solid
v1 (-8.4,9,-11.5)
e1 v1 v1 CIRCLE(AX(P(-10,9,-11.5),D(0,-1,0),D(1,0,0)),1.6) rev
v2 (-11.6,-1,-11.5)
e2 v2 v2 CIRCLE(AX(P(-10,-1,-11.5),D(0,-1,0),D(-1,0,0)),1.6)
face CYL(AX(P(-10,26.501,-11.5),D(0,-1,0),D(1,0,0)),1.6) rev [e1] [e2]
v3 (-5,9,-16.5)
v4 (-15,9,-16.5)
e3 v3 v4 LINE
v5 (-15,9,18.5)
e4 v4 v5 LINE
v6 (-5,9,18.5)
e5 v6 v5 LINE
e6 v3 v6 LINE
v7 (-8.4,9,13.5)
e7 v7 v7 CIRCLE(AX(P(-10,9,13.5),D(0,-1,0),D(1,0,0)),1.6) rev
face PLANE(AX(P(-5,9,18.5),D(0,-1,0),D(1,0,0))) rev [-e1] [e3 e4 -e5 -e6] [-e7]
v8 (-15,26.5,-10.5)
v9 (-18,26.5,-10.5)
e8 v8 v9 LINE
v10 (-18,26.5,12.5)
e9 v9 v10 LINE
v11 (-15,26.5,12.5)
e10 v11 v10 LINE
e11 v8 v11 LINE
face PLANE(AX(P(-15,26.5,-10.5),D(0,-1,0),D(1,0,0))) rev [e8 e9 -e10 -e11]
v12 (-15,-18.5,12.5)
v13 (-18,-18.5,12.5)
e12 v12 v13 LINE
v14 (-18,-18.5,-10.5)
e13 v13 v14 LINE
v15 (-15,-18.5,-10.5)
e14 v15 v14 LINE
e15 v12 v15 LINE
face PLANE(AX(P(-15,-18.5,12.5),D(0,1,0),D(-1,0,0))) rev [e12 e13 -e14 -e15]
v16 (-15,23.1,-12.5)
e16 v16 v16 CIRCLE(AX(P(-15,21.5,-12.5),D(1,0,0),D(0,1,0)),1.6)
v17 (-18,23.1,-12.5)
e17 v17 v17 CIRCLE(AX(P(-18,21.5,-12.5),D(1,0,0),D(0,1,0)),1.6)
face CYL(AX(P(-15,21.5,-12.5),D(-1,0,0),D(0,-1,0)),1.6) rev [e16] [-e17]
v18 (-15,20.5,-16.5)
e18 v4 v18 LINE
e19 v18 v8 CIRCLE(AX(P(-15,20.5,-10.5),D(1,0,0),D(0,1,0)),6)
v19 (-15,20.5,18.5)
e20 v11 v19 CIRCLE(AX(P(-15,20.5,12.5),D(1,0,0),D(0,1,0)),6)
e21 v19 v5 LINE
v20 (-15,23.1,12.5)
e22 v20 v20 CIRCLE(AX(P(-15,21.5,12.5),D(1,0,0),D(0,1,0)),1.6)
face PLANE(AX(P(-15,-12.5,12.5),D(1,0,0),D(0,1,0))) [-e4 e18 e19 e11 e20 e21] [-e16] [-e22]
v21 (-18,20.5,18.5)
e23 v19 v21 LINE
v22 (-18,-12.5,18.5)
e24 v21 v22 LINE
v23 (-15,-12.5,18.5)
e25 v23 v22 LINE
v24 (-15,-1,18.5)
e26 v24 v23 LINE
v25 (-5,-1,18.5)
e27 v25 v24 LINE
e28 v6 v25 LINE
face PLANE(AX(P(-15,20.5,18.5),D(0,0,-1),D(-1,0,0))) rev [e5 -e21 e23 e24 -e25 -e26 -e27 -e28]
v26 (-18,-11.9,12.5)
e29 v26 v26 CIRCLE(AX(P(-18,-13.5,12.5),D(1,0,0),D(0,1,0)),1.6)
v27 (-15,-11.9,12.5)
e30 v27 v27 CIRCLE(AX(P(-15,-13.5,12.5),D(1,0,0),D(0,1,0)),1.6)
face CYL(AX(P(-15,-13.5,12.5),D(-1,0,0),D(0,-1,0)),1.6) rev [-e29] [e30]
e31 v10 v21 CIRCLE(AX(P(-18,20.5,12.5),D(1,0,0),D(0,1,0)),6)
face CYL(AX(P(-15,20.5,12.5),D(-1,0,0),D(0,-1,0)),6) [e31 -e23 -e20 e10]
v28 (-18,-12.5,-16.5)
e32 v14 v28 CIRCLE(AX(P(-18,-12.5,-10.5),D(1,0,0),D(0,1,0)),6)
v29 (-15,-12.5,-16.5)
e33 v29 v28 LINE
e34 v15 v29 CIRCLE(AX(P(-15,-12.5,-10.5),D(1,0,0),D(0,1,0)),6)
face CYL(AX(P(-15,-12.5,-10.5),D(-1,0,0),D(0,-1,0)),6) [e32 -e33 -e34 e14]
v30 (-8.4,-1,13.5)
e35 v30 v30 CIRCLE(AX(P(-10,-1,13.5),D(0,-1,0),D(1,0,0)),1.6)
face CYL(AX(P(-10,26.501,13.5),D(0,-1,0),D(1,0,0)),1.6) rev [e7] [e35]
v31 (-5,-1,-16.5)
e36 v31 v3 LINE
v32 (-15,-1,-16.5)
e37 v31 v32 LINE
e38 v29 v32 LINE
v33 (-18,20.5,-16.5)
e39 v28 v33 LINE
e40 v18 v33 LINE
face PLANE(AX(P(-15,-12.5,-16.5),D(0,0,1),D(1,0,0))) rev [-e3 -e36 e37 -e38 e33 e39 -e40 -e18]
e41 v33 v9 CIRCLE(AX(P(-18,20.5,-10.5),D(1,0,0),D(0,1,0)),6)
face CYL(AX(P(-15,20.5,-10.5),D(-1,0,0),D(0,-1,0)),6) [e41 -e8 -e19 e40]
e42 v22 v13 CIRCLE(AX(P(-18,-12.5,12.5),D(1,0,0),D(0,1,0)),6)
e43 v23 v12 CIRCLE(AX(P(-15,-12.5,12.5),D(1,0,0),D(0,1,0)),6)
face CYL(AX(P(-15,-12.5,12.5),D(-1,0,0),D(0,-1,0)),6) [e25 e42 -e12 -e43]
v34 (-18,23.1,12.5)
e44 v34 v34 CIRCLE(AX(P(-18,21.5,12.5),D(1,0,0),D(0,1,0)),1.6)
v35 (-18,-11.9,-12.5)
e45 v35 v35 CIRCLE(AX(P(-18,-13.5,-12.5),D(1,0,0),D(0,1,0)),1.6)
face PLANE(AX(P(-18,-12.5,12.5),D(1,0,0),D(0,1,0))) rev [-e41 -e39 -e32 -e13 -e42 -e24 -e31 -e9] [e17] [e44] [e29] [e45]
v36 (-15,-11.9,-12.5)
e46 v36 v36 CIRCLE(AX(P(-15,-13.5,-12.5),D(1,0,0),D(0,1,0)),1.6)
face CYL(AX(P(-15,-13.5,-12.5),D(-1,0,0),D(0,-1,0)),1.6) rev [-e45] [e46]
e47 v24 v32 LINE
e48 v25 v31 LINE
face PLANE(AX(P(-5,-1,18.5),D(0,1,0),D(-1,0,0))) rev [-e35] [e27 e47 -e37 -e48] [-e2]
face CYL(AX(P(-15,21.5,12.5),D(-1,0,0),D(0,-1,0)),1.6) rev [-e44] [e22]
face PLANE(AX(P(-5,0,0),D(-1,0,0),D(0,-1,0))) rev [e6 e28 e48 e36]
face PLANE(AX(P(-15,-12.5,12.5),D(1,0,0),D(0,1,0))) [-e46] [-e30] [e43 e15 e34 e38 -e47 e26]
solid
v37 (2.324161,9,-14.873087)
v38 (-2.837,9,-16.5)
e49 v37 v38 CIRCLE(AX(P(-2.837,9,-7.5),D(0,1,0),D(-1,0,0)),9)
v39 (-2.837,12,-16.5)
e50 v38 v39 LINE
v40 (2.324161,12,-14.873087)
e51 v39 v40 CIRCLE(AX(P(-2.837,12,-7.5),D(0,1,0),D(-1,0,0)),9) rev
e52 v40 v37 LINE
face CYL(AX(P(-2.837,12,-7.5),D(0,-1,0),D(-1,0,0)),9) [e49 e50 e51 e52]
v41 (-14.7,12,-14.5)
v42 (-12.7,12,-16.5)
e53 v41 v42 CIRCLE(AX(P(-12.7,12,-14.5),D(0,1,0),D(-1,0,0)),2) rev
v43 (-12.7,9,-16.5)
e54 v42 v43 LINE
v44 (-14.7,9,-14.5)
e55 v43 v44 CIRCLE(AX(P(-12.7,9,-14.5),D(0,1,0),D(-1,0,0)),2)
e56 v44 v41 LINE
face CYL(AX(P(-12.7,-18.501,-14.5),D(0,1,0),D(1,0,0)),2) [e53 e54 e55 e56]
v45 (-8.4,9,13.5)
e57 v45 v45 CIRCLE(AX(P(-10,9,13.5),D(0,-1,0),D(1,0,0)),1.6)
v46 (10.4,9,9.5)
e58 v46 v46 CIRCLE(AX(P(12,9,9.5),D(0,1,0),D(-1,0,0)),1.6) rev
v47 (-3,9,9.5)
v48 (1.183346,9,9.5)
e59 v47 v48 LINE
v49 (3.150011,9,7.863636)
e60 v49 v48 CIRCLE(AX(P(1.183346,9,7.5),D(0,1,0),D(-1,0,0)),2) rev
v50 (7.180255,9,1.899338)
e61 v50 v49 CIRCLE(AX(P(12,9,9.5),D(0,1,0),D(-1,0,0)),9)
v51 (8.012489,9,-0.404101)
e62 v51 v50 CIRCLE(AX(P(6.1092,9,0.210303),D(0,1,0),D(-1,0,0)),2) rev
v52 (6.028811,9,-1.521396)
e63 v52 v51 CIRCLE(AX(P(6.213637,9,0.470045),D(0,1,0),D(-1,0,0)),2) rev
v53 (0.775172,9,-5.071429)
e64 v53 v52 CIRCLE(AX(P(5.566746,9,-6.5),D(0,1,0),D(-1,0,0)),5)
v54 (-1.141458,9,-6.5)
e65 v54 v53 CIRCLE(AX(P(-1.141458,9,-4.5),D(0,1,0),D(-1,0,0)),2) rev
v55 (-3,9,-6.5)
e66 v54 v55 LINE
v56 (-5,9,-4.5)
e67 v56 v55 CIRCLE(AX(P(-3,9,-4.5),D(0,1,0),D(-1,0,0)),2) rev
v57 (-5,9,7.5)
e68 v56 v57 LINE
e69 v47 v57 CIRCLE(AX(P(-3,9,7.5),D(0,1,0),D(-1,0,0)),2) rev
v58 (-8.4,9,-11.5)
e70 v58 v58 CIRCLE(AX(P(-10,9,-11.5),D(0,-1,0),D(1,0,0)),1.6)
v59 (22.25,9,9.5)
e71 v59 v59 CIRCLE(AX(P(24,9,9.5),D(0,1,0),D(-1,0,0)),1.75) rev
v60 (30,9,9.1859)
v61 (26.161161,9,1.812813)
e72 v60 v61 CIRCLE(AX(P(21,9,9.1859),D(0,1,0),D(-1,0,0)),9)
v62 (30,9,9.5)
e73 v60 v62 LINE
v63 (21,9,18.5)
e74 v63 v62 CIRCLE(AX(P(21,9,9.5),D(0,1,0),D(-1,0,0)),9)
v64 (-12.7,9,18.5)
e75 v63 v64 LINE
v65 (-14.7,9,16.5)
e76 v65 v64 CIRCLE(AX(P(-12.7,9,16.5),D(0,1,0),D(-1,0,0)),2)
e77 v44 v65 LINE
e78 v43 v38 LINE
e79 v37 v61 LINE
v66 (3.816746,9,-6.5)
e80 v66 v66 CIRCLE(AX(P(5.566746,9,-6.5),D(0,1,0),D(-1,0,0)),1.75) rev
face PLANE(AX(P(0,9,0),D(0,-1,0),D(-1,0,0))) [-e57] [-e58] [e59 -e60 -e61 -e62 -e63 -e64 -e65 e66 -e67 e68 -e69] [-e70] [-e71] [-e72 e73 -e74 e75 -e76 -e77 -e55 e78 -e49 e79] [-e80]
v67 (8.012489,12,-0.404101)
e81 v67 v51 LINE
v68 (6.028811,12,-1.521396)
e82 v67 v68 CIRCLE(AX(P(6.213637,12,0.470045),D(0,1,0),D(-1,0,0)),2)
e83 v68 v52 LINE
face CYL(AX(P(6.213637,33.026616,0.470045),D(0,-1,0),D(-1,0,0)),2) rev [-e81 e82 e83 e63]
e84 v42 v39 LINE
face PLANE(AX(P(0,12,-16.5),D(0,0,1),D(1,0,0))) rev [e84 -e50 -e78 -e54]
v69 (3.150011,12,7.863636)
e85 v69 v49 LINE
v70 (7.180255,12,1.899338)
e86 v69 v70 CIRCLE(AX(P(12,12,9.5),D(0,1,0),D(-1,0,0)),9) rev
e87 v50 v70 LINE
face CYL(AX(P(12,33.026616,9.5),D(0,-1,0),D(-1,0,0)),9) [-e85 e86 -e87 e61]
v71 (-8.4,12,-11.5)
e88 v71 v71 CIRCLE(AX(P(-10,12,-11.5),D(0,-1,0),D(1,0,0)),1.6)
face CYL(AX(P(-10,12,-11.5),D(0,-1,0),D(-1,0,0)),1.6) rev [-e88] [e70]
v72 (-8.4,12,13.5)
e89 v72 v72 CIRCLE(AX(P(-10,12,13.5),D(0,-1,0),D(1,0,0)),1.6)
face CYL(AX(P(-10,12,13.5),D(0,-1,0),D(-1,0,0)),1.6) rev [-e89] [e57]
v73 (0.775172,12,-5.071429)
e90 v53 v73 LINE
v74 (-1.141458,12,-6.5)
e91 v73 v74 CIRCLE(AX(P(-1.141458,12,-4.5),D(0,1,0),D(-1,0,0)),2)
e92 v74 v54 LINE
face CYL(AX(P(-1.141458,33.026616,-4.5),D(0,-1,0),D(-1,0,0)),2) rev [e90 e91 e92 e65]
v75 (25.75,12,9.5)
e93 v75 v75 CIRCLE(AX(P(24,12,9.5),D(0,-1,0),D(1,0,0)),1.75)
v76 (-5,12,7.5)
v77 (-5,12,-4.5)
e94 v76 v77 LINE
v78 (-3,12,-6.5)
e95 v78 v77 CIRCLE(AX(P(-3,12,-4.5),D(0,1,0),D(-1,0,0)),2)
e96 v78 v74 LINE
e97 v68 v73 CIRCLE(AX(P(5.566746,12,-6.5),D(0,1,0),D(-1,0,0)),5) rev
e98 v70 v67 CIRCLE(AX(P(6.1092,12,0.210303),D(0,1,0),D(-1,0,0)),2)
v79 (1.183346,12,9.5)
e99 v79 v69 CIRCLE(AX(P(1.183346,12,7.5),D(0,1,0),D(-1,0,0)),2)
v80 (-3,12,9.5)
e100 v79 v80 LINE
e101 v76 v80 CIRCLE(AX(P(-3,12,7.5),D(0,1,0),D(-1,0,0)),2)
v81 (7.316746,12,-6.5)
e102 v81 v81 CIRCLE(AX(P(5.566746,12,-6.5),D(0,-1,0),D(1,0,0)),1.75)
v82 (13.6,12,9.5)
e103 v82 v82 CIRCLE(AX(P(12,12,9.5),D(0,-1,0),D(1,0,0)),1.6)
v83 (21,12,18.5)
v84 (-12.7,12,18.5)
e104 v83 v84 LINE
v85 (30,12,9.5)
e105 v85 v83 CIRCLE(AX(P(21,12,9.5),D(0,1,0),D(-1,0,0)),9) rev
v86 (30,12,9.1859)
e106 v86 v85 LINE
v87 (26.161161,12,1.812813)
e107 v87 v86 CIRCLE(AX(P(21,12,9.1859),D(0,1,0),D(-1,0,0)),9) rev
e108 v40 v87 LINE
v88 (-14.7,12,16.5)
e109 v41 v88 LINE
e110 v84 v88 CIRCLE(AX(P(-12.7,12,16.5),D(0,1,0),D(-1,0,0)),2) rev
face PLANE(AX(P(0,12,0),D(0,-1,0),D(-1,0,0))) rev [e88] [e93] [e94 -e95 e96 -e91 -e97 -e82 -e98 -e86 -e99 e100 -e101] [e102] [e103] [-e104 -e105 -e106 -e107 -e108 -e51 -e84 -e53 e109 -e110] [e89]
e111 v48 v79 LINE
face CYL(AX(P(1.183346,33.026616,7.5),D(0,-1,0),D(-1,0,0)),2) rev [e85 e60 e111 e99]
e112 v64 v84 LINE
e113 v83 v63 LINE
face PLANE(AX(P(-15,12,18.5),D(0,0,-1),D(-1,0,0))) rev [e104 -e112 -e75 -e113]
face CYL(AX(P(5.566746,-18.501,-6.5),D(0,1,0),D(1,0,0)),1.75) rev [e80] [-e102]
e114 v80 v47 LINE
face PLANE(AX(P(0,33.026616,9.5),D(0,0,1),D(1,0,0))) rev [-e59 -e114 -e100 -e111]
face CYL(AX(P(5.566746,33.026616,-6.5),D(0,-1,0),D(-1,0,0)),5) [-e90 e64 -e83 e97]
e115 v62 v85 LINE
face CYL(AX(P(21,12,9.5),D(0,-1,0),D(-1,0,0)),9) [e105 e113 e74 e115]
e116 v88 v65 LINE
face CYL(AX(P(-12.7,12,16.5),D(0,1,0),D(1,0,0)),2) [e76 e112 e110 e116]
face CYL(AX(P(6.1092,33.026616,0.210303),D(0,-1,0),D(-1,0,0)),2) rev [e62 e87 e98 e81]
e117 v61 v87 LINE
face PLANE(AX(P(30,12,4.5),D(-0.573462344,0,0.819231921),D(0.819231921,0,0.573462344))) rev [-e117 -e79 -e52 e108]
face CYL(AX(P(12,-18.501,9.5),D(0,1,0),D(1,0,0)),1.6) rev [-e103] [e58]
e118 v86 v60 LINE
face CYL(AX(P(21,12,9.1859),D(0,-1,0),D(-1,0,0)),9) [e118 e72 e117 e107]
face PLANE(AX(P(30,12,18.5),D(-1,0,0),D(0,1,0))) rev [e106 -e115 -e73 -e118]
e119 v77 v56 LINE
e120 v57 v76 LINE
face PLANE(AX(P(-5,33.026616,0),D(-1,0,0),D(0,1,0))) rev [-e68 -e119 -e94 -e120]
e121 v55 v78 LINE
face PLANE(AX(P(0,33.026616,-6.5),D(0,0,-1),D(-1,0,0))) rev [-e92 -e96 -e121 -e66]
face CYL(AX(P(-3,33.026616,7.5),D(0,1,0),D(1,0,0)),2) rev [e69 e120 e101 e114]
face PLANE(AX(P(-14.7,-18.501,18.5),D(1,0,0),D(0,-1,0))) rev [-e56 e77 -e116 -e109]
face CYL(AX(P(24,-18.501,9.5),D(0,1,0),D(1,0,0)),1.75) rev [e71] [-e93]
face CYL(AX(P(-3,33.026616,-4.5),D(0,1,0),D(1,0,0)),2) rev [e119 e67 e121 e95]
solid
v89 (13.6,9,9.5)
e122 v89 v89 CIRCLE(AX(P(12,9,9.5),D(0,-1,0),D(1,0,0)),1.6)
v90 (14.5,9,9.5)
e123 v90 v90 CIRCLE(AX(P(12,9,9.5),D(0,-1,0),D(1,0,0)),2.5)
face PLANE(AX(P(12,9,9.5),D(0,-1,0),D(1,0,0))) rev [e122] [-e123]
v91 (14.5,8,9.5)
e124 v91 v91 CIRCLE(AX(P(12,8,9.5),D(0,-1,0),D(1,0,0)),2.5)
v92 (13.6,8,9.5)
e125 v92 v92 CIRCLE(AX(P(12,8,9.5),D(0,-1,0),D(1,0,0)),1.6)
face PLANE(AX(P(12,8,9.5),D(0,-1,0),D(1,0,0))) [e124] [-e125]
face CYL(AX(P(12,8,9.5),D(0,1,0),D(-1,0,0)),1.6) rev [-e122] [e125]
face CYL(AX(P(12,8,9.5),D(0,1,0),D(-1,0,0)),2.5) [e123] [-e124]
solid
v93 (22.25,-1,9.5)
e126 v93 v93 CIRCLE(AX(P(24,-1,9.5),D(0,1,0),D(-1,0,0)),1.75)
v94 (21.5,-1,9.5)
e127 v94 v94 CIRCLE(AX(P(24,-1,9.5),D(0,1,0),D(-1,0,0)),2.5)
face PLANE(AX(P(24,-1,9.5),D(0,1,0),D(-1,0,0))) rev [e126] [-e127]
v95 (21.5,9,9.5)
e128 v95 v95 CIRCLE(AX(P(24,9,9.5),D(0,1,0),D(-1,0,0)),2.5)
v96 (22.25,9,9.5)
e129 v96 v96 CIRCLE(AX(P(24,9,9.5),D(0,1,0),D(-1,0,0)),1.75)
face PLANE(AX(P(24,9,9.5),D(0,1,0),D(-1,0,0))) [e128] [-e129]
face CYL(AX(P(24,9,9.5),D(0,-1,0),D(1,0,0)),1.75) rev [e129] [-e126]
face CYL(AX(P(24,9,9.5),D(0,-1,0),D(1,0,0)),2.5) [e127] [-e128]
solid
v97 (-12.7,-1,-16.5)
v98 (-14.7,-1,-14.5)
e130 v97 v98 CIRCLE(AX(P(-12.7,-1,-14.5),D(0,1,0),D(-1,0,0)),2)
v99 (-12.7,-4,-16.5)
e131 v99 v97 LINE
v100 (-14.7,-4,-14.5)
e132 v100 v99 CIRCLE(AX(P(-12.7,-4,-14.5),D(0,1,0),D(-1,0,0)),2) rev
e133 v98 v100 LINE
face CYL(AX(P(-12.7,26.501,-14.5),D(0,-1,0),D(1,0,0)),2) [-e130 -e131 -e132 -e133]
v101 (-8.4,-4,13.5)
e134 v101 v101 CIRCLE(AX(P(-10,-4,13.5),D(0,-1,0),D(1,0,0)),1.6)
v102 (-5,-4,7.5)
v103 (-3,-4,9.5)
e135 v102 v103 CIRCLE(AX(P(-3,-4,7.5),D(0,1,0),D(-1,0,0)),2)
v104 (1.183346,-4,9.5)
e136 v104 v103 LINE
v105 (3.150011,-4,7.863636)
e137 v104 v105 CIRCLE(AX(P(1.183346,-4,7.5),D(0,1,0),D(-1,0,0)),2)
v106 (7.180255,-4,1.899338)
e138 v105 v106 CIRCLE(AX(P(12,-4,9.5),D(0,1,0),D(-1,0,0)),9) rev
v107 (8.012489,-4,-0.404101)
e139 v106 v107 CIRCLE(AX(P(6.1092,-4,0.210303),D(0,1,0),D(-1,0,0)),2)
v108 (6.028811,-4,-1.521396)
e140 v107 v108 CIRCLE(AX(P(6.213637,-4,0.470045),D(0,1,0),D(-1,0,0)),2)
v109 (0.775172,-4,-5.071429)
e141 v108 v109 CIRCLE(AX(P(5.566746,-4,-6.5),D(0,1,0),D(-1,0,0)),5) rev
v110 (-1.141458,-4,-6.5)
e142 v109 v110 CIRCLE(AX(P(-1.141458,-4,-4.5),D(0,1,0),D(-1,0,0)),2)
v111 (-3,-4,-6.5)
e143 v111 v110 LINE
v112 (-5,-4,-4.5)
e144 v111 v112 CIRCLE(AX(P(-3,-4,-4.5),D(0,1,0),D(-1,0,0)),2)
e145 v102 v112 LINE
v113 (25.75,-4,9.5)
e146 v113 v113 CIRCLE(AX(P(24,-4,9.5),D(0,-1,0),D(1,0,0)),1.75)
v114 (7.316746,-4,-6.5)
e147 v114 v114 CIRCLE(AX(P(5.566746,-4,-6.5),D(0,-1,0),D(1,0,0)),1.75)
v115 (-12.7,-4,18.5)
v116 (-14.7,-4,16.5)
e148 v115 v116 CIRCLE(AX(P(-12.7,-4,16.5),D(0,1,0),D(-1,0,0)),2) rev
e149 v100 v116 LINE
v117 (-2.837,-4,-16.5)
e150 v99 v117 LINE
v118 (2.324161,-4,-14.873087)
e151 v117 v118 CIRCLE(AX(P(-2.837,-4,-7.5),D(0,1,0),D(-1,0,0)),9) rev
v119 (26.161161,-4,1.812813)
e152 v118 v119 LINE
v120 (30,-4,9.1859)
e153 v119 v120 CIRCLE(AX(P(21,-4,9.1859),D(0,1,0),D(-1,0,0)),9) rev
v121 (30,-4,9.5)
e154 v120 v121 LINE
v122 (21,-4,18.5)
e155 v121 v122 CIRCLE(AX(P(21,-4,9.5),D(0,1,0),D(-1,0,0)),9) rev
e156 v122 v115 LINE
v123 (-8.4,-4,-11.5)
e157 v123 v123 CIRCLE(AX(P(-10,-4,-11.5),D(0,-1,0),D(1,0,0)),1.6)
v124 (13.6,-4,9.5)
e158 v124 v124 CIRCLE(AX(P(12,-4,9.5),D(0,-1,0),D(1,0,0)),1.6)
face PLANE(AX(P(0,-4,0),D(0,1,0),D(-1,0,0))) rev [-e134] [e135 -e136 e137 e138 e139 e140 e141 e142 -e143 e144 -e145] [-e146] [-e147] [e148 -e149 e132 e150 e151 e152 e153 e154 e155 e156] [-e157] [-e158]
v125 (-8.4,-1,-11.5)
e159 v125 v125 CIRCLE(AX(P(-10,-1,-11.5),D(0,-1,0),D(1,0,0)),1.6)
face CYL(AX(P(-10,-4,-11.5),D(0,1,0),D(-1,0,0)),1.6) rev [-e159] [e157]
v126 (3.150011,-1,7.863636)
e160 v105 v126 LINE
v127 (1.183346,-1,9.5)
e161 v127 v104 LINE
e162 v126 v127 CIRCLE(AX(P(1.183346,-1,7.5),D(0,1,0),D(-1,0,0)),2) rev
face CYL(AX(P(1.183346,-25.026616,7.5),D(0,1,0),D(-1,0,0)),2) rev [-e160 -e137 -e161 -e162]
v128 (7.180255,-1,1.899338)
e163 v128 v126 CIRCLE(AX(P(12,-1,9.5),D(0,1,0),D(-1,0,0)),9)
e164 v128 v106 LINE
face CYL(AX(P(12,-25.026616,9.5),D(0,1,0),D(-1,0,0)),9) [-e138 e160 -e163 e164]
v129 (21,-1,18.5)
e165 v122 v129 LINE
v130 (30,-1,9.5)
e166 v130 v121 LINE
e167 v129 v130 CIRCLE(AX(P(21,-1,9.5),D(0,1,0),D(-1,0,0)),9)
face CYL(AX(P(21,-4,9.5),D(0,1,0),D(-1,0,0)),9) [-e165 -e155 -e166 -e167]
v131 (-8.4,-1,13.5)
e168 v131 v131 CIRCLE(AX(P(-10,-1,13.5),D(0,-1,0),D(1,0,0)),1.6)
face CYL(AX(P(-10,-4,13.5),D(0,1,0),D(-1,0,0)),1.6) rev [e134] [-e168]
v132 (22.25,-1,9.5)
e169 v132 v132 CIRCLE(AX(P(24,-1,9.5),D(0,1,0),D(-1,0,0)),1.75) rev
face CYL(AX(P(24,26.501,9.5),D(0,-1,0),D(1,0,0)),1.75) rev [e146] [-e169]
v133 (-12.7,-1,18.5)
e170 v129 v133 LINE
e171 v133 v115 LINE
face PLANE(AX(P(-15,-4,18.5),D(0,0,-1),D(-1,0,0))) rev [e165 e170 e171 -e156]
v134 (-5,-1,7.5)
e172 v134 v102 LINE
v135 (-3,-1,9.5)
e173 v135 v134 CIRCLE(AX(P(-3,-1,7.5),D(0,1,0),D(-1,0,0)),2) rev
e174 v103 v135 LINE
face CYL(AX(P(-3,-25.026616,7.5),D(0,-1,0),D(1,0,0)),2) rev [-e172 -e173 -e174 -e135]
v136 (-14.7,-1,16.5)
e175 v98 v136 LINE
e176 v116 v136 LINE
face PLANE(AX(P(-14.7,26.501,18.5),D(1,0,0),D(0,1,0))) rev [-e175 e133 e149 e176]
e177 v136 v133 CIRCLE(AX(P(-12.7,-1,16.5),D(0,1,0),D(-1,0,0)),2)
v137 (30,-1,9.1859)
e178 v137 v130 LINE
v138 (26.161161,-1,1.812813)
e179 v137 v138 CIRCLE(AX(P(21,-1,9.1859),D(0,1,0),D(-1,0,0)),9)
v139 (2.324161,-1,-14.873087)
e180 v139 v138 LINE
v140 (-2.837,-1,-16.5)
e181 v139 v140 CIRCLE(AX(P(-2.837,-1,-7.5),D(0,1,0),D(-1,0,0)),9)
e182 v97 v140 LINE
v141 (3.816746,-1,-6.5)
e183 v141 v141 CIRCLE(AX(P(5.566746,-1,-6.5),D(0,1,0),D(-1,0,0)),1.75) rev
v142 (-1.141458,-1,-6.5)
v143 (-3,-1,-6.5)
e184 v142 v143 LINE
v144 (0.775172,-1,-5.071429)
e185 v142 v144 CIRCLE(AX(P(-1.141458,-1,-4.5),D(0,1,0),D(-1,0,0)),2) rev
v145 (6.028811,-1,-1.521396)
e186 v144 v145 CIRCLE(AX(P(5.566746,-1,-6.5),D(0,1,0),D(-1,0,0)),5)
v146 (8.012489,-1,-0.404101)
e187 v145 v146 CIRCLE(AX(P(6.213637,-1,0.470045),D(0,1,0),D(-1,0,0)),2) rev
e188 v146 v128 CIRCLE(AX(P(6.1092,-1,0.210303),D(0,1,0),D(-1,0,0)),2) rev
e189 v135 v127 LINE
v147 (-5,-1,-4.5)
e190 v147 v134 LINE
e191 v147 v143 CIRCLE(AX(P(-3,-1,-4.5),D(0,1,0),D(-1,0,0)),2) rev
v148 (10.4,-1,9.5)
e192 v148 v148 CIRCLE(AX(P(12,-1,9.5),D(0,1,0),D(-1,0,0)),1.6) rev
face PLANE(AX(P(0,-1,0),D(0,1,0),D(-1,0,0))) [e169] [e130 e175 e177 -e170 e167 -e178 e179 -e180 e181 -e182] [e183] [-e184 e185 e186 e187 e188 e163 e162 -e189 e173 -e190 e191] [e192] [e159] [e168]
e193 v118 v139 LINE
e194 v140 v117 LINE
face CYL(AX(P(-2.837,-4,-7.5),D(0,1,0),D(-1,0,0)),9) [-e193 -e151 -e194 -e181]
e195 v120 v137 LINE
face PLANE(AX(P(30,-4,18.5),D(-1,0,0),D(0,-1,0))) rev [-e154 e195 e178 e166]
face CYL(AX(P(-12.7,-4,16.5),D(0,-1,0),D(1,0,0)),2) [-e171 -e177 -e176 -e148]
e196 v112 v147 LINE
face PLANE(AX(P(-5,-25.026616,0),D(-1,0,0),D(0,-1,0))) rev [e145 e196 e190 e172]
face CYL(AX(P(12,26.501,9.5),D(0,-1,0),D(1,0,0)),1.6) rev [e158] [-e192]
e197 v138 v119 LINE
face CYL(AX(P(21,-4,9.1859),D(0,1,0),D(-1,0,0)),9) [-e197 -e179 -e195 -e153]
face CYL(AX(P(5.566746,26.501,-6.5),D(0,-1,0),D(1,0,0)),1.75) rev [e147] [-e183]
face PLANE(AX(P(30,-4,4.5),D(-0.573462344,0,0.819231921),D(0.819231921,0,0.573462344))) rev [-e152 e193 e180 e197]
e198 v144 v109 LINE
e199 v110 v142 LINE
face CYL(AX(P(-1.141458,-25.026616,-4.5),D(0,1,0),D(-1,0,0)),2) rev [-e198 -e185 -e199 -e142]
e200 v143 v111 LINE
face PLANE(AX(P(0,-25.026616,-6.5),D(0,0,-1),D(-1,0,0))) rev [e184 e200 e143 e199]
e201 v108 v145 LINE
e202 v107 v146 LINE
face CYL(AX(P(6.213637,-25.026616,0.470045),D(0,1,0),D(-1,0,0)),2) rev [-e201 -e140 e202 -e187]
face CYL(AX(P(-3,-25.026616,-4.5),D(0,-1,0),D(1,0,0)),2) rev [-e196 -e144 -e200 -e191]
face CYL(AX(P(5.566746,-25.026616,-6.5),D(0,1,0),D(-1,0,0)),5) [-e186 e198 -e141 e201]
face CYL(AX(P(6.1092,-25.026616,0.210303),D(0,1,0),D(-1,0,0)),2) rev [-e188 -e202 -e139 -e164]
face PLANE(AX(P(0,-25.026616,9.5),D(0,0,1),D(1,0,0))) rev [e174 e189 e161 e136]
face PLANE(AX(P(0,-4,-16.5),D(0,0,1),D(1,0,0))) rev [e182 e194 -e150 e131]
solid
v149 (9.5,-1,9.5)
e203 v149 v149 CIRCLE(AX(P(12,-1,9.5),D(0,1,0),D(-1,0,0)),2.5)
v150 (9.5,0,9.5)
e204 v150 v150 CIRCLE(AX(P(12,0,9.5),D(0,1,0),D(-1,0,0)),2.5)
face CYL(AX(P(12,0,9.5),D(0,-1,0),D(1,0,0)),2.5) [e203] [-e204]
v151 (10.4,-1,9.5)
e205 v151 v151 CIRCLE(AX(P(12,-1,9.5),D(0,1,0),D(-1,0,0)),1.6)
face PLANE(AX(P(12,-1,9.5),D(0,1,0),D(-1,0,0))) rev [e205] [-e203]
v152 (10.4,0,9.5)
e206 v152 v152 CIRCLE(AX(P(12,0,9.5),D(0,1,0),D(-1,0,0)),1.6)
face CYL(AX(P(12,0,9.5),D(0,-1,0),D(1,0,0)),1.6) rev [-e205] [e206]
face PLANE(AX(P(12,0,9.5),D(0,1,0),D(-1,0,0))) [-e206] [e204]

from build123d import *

# Parameters (mm, degrees)
SKETCH_1_R          = 1.6
EXTRUDE_1_DEPTH     = 3
SKETCH_2_W          = 35
SKETCH_2_H          = 10
EXTRUDE_2_DEPTH     = 10
CUT_EXTRUDE_2_REACH = 39.716
SKETCH_4_R          = 1.6
SKETCH_6_R          = 1.6
EXTRUDE_3_DEPTH     = 3
SKETCH_7_R          = 1.6
CUT_EXTRUDE_3_DEPTH = 3
SKETCH_8_R          = 1.75
CUT_EXTRUDE_4_DEPTH = 3
SKETCH_11_W         = 0.3
SKETCH_11_H         = 35
CUT_EXTRUDE_6_DEPTH = 3
FILLET_2_R          = 9
FILLET_4_R          = 2
CUT_EXTRUDE_9_DEPTH = 3
FILLET_5_R          = 2
SKETCH_9_R          = 2.5
SKETCH_9_R_2        = 1.75
EXTRUDE_4_DEPTH     = 10
SKETCH_13_R         = 2.5
SKETCH_13_R_2       = 1.6
EXTRUDE_5_DEPTH     = 1
SKETCH_14_R         = 2.5
SKETCH_14_R_2       = 1.6
EXTRUDE_6_DEPTH     = 1


with BuildPart() as part:
    # 草图1 → 凸台-拉伸1 (new body)
    with BuildSketch(Plane(origin=(-18, 0, 0), x_dir=(0, 0, -1), z_dir=(1, 0, 0))):
        with BuildLine():
            Line((-12.5, -18.5), (10.5, -18.5))
            ThreePointArc((10.5, -18.5), (14.742640687, -16.742640687), (16.5, -12.5))
            Line((16.5, -12.5), (16.5, 20.5))
            ThreePointArc((16.5, 20.5), (14.742640687, 24.742640687), (10.5, 26.5))
            Line((10.5, 26.5), (-12.5, 26.5))
            ThreePointArc((-12.5, 26.5), (-16.742640687, 24.742640687), (-18.5, 20.5))
            Line((-18.5, 20.5), (-18.5, -12.5))
            ThreePointArc((-18.5, -12.5), (-16.742640687, -16.742640687), (-12.5, -18.5))
        make_face()
        with Locations(Location((-12.5, -13.5, 0), (0, 0, 90))):
            Circle(SKETCH_1_R, mode=Mode.SUBTRACT)
        with Locations(Location((12.5, -13.5, 0), (0, 0, 90))):
            Circle(SKETCH_1_R, mode=Mode.SUBTRACT)
        with Locations(Location((12.5, 21.5, 0), (0, 0, 90))):
            Circle(SKETCH_1_R, mode=Mode.SUBTRACT)
        with Locations(Location((-12.5, 21.5, 0), (0, 0, 90))):
            Circle(SKETCH_1_R, mode=Mode.SUBTRACT)
    extrude(amount=EXTRUDE_1_DEPTH)

    # 草图2 → 凸台-拉伸2 (add)
    with BuildSketch(Plane(origin=(-15, 0, 0), x_dir=(0, 0, -1), z_dir=(1, 0, 0))):
        with Locations((-1, 4)):
            Rectangle(SKETCH_2_W, SKETCH_2_H)
    extrude(amount=EXTRUDE_2_DEPTH)

    # 草图4 → 切除-拉伸2 (cut, up to next)
    with BuildSketch(Plane.XZ.offset(1), mode=Mode.PRIVATE) as cut_extrude_2_sk1:
        with Locations((-10, 13.5)):
            Circle(SKETCH_4_R)
    cut_extrude_2_tool1 = extrude(cut_extrude_2_sk1.sketch, amount=-CUT_EXTRUDE_2_REACH, mode=Mode.PRIVATE) & part.part
    # 草图4 → 切除-拉伸2 (cut, up to next)
    with BuildSketch(Plane.XZ.offset(1), mode=Mode.PRIVATE) as cut_extrude_2_sk2:
        with Locations((-10, -11.5)):
            Circle(SKETCH_4_R)
    cut_extrude_2_tool2 = extrude(cut_extrude_2_sk2.sketch, amount=-CUT_EXTRUDE_2_REACH, mode=Mode.PRIVATE) & part.part
    add(cut_extrude_2_tool1.solids().sort_by_distance((-10, -1, 13.5))[0], mode=Mode.SUBTRACT)
    add(cut_extrude_2_tool2.solids().sort_by_distance((-10, -1, -11.5))[0], mode=Mode.SUBTRACT)


with BuildPart() as body_2:
    # 草图6 → 凸台-拉伸3 (new body)
    with BuildSketch(Plane.XZ.offset(1)):
        Polygon((-15, 18.5), (30, 18.5), (30, 4.5), (0, -16.5), (-15, -16.5), align=None)
        with Locations((-10, -11.5)):
            Circle(SKETCH_6_R, mode=Mode.SUBTRACT)
        with Locations((-10, 13.5)):
            Circle(SKETCH_6_R, mode=Mode.SUBTRACT)
    extrude(amount=EXTRUDE_3_DEPTH)

    # 草图7 → 切除-拉伸3 (cut)
    with BuildSketch(Plane.XZ.offset(4)):
        with Locations((12, 9.5)):
            Circle(SKETCH_7_R)
    extrude(amount=-CUT_EXTRUDE_3_DEPTH, mode=Mode.SUBTRACT)

    # 草图8 → 切除-拉伸4 (cut)
    with BuildSketch(Plane.XZ.offset(4)):
        with Locations((24, 9.5)):
            Circle(SKETCH_8_R)
        with Locations((5.566745989, -6.5)):
            Circle(SKETCH_8_R)
    extrude(amount=-CUT_EXTRUDE_4_DEPTH, mode=Mode.SUBTRACT)

    # 草图11 → 切除-拉伸6 (cut)
    with BuildSketch(Plane.XZ.offset(4)):
        with Locations((-14.85, 1)):
            Rectangle(SKETCH_11_W, SKETCH_11_H)
    extrude(amount=-CUT_EXTRUDE_6_DEPTH, mode=Mode.SUBTRACT)

    # 圆角2
    fillet_2_edges = [body_2.edges().sort_by_distance(p)[0] for p in [
        (30, -2.5, 18.5),
        (30, -2.5, 4.5),
        (0, -2.5, -16.5),
    ]]
    fillet(fillet_2_edges, radius=FILLET_2_R)

    # 圆角4
    fillet_4_edges = [body_2.edges().sort_by_distance(p)[0] for p in [
        (-14.7, -2.5, 18.5),
        (-14.7, -2.5, -16.5),
    ]]
    fillet(fillet_4_edges, radius=FILLET_4_R)

    # 草图12 → 切除-拉伸9 (cut)
    with BuildSketch(Plane(origin=(0, -1, 0), x_dir=(1, 0, 0), z_dir=(0, 1, 0))):
        with BuildLine():
            ThreePointArc((7.432008197, 1.860948708), (2.767309531, 2.357156107), (0.566745989, 6.5))
            Line((0.566745989, 6.5), (-5, 6.5))
            Line((-5, 6.5), (-5, -9.5))
            Line((-5, -9.5), (-0.844316184, -9.5))
            Line((-0.844316184, -9.5), (3, -9.5))
            ThreePointArc((3, -9.5), (4.542880993, -4.461014377), (8.642528025, -1.149707674))
            Line((8.642528025, -1.149707674), (7.432008197, 1.860948708))
        make_face()
    extrude(amount=-CUT_EXTRUDE_9_DEPTH, mode=Mode.SUBTRACT)

    # 圆角5
    # the kernel refuses this fillet: 2 mm, written as the material it adds along each edge
    with BuildSketch(Plane(origin=(3, -1, 9.5), x_dir=(-1, 0, 0), z_dir=(0, -1, 0))) as fillet_5_piece_1:
        with BuildLine():
            CenterArc((1.816653826, 2), FILLET_5_R, 190.475681696, 79.524318304)
            ThreePointArc((-0.150010506, 1.636363636), (-0.03758109, 0.821612607), (0, 0))
            Line((0, 0), (1.816653826, 0))
        make_face()
    extrude(amount=3)
    with BuildSketch(Plane(origin=(-5, -1, 9.5), x_dir=(0, 0, -1), z_dir=(0, -1, 0)), Plane(origin=(-5, -1, -6.5), x_dir=(1, 0, 0), z_dir=(0, -1, 0))) as fillet_5_piece_2:
        with BuildLine():
            CenterArc((FILLET_5_R, FILLET_5_R), FILLET_5_R, 180, 90)
            Line((0, FILLET_5_R), (0, 0))
            Line((0, 0), (FILLET_5_R, 0))
        make_face()
    extrude(amount=3)
    with BuildSketch(Plane(origin=(0.566745989, -1, -6.5), x_dir=(0.1443695821495735, 0, 0.9895238368781005), z_dir=(0, -1, 0))) as fillet_5_piece_3:
        with BuildLine():
            CenterArc((1.732434986, 1.979047674), FILLET_5_R, 188.300774799, 73.398450401)
            Line((-0.246612688, 1.690308509), (0, 0))
            ThreePointArc((0, 0), (0.721847911, 0.052380816), (1.443695821, 0))
        make_face()
    extrude(amount=3)
    with BuildSketch(Plane(origin=(7.432008197, -1, -1.860948708), x_dir=(-0.9719477919968166, 0, 0.23519670412765736), z_dir=(0, -1, 0))) as fillet_5_piece_4:
        with BuildLine():
            CenterArc((1.732434986, -1.979047674), FILLET_5_R, 98.3007748, 73.398450401)
            Line((-0.246612688, -1.690308509), (0, 0))
            ThreePointArc((0, 0), (0.721847911, -0.052380816), (1.443695821, 0))
        make_face()
    extrude(amount=3)
    with BuildSketch(Plane(origin=(8.642528025, -1, 1.149707674), x_dir=(-0.8898799574196085, 0, 0.45619476255528824), z_dir=(0, -1, 0))) as fillet_5_piece_5:
        with BuildLine():
            CenterArc((1.825805793, 1.991648647), FILLET_5_R, 185.237840848, 79.524318304)
            Line((-0.165842854, 1.809068067), (0, 0))
            ThreePointArc((0, 0), (0.821612607, 0.03758109), (1.643225213, 0))
        make_face()
    extrude(amount=3)


with BuildPart() as body_3:
    # 镜向1: mirrored copy
    add(body_2.part.mirror(Plane(origin=(0, 4, 0), x_dir=(0, 0, 1), z_dir=(0, -1, 0))))


with BuildPart() as body_4:
    # 草图9 → 凸台-拉伸4 (new body)
    with BuildSketch(Plane(origin=(0, -1, 0), x_dir=(1, 0, 0), z_dir=(0, 1, 0))):
        with Locations(Location((24, -9.5, 0), (0, 0, 180))):
            Circle(SKETCH_9_R)
        with Locations(Location((24, -9.5, 0), (0, 0, 180))):
            Circle(SKETCH_9_R_2, mode=Mode.SUBTRACT)
    extrude(amount=EXTRUDE_4_DEPTH)


with BuildPart() as body_5:
    # 草图13 → 凸台-拉伸5 (new body)
    with BuildSketch(Plane(origin=(0, -1, 0), x_dir=(1, 0, 0), z_dir=(0, 1, 0))):
        with Locations(Location((12, -9.5, 0), (0, 0, 180))):
            Circle(SKETCH_13_R)
        with Locations(Location((12, -9.5, 0), (0, 0, 180))):
            Circle(SKETCH_13_R_2, mode=Mode.SUBTRACT)
    extrude(amount=EXTRUDE_5_DEPTH)


with BuildPart() as body_6:
    # 草图14 → 凸台-拉伸6 (new body)
    with BuildSketch(Plane.XZ.offset(-9)):
        with Locations((12, 9.5)):
            Circle(SKETCH_14_R)
        with Locations((12, 9.5)):
            Circle(SKETCH_14_R_2, mode=Mode.SUBTRACT)
    extrude(amount=EXTRUDE_6_DEPTH)


solid = Compound([part.part, body_2.part, body_3.part, body_4.part, body_5.part, body_6.part])
